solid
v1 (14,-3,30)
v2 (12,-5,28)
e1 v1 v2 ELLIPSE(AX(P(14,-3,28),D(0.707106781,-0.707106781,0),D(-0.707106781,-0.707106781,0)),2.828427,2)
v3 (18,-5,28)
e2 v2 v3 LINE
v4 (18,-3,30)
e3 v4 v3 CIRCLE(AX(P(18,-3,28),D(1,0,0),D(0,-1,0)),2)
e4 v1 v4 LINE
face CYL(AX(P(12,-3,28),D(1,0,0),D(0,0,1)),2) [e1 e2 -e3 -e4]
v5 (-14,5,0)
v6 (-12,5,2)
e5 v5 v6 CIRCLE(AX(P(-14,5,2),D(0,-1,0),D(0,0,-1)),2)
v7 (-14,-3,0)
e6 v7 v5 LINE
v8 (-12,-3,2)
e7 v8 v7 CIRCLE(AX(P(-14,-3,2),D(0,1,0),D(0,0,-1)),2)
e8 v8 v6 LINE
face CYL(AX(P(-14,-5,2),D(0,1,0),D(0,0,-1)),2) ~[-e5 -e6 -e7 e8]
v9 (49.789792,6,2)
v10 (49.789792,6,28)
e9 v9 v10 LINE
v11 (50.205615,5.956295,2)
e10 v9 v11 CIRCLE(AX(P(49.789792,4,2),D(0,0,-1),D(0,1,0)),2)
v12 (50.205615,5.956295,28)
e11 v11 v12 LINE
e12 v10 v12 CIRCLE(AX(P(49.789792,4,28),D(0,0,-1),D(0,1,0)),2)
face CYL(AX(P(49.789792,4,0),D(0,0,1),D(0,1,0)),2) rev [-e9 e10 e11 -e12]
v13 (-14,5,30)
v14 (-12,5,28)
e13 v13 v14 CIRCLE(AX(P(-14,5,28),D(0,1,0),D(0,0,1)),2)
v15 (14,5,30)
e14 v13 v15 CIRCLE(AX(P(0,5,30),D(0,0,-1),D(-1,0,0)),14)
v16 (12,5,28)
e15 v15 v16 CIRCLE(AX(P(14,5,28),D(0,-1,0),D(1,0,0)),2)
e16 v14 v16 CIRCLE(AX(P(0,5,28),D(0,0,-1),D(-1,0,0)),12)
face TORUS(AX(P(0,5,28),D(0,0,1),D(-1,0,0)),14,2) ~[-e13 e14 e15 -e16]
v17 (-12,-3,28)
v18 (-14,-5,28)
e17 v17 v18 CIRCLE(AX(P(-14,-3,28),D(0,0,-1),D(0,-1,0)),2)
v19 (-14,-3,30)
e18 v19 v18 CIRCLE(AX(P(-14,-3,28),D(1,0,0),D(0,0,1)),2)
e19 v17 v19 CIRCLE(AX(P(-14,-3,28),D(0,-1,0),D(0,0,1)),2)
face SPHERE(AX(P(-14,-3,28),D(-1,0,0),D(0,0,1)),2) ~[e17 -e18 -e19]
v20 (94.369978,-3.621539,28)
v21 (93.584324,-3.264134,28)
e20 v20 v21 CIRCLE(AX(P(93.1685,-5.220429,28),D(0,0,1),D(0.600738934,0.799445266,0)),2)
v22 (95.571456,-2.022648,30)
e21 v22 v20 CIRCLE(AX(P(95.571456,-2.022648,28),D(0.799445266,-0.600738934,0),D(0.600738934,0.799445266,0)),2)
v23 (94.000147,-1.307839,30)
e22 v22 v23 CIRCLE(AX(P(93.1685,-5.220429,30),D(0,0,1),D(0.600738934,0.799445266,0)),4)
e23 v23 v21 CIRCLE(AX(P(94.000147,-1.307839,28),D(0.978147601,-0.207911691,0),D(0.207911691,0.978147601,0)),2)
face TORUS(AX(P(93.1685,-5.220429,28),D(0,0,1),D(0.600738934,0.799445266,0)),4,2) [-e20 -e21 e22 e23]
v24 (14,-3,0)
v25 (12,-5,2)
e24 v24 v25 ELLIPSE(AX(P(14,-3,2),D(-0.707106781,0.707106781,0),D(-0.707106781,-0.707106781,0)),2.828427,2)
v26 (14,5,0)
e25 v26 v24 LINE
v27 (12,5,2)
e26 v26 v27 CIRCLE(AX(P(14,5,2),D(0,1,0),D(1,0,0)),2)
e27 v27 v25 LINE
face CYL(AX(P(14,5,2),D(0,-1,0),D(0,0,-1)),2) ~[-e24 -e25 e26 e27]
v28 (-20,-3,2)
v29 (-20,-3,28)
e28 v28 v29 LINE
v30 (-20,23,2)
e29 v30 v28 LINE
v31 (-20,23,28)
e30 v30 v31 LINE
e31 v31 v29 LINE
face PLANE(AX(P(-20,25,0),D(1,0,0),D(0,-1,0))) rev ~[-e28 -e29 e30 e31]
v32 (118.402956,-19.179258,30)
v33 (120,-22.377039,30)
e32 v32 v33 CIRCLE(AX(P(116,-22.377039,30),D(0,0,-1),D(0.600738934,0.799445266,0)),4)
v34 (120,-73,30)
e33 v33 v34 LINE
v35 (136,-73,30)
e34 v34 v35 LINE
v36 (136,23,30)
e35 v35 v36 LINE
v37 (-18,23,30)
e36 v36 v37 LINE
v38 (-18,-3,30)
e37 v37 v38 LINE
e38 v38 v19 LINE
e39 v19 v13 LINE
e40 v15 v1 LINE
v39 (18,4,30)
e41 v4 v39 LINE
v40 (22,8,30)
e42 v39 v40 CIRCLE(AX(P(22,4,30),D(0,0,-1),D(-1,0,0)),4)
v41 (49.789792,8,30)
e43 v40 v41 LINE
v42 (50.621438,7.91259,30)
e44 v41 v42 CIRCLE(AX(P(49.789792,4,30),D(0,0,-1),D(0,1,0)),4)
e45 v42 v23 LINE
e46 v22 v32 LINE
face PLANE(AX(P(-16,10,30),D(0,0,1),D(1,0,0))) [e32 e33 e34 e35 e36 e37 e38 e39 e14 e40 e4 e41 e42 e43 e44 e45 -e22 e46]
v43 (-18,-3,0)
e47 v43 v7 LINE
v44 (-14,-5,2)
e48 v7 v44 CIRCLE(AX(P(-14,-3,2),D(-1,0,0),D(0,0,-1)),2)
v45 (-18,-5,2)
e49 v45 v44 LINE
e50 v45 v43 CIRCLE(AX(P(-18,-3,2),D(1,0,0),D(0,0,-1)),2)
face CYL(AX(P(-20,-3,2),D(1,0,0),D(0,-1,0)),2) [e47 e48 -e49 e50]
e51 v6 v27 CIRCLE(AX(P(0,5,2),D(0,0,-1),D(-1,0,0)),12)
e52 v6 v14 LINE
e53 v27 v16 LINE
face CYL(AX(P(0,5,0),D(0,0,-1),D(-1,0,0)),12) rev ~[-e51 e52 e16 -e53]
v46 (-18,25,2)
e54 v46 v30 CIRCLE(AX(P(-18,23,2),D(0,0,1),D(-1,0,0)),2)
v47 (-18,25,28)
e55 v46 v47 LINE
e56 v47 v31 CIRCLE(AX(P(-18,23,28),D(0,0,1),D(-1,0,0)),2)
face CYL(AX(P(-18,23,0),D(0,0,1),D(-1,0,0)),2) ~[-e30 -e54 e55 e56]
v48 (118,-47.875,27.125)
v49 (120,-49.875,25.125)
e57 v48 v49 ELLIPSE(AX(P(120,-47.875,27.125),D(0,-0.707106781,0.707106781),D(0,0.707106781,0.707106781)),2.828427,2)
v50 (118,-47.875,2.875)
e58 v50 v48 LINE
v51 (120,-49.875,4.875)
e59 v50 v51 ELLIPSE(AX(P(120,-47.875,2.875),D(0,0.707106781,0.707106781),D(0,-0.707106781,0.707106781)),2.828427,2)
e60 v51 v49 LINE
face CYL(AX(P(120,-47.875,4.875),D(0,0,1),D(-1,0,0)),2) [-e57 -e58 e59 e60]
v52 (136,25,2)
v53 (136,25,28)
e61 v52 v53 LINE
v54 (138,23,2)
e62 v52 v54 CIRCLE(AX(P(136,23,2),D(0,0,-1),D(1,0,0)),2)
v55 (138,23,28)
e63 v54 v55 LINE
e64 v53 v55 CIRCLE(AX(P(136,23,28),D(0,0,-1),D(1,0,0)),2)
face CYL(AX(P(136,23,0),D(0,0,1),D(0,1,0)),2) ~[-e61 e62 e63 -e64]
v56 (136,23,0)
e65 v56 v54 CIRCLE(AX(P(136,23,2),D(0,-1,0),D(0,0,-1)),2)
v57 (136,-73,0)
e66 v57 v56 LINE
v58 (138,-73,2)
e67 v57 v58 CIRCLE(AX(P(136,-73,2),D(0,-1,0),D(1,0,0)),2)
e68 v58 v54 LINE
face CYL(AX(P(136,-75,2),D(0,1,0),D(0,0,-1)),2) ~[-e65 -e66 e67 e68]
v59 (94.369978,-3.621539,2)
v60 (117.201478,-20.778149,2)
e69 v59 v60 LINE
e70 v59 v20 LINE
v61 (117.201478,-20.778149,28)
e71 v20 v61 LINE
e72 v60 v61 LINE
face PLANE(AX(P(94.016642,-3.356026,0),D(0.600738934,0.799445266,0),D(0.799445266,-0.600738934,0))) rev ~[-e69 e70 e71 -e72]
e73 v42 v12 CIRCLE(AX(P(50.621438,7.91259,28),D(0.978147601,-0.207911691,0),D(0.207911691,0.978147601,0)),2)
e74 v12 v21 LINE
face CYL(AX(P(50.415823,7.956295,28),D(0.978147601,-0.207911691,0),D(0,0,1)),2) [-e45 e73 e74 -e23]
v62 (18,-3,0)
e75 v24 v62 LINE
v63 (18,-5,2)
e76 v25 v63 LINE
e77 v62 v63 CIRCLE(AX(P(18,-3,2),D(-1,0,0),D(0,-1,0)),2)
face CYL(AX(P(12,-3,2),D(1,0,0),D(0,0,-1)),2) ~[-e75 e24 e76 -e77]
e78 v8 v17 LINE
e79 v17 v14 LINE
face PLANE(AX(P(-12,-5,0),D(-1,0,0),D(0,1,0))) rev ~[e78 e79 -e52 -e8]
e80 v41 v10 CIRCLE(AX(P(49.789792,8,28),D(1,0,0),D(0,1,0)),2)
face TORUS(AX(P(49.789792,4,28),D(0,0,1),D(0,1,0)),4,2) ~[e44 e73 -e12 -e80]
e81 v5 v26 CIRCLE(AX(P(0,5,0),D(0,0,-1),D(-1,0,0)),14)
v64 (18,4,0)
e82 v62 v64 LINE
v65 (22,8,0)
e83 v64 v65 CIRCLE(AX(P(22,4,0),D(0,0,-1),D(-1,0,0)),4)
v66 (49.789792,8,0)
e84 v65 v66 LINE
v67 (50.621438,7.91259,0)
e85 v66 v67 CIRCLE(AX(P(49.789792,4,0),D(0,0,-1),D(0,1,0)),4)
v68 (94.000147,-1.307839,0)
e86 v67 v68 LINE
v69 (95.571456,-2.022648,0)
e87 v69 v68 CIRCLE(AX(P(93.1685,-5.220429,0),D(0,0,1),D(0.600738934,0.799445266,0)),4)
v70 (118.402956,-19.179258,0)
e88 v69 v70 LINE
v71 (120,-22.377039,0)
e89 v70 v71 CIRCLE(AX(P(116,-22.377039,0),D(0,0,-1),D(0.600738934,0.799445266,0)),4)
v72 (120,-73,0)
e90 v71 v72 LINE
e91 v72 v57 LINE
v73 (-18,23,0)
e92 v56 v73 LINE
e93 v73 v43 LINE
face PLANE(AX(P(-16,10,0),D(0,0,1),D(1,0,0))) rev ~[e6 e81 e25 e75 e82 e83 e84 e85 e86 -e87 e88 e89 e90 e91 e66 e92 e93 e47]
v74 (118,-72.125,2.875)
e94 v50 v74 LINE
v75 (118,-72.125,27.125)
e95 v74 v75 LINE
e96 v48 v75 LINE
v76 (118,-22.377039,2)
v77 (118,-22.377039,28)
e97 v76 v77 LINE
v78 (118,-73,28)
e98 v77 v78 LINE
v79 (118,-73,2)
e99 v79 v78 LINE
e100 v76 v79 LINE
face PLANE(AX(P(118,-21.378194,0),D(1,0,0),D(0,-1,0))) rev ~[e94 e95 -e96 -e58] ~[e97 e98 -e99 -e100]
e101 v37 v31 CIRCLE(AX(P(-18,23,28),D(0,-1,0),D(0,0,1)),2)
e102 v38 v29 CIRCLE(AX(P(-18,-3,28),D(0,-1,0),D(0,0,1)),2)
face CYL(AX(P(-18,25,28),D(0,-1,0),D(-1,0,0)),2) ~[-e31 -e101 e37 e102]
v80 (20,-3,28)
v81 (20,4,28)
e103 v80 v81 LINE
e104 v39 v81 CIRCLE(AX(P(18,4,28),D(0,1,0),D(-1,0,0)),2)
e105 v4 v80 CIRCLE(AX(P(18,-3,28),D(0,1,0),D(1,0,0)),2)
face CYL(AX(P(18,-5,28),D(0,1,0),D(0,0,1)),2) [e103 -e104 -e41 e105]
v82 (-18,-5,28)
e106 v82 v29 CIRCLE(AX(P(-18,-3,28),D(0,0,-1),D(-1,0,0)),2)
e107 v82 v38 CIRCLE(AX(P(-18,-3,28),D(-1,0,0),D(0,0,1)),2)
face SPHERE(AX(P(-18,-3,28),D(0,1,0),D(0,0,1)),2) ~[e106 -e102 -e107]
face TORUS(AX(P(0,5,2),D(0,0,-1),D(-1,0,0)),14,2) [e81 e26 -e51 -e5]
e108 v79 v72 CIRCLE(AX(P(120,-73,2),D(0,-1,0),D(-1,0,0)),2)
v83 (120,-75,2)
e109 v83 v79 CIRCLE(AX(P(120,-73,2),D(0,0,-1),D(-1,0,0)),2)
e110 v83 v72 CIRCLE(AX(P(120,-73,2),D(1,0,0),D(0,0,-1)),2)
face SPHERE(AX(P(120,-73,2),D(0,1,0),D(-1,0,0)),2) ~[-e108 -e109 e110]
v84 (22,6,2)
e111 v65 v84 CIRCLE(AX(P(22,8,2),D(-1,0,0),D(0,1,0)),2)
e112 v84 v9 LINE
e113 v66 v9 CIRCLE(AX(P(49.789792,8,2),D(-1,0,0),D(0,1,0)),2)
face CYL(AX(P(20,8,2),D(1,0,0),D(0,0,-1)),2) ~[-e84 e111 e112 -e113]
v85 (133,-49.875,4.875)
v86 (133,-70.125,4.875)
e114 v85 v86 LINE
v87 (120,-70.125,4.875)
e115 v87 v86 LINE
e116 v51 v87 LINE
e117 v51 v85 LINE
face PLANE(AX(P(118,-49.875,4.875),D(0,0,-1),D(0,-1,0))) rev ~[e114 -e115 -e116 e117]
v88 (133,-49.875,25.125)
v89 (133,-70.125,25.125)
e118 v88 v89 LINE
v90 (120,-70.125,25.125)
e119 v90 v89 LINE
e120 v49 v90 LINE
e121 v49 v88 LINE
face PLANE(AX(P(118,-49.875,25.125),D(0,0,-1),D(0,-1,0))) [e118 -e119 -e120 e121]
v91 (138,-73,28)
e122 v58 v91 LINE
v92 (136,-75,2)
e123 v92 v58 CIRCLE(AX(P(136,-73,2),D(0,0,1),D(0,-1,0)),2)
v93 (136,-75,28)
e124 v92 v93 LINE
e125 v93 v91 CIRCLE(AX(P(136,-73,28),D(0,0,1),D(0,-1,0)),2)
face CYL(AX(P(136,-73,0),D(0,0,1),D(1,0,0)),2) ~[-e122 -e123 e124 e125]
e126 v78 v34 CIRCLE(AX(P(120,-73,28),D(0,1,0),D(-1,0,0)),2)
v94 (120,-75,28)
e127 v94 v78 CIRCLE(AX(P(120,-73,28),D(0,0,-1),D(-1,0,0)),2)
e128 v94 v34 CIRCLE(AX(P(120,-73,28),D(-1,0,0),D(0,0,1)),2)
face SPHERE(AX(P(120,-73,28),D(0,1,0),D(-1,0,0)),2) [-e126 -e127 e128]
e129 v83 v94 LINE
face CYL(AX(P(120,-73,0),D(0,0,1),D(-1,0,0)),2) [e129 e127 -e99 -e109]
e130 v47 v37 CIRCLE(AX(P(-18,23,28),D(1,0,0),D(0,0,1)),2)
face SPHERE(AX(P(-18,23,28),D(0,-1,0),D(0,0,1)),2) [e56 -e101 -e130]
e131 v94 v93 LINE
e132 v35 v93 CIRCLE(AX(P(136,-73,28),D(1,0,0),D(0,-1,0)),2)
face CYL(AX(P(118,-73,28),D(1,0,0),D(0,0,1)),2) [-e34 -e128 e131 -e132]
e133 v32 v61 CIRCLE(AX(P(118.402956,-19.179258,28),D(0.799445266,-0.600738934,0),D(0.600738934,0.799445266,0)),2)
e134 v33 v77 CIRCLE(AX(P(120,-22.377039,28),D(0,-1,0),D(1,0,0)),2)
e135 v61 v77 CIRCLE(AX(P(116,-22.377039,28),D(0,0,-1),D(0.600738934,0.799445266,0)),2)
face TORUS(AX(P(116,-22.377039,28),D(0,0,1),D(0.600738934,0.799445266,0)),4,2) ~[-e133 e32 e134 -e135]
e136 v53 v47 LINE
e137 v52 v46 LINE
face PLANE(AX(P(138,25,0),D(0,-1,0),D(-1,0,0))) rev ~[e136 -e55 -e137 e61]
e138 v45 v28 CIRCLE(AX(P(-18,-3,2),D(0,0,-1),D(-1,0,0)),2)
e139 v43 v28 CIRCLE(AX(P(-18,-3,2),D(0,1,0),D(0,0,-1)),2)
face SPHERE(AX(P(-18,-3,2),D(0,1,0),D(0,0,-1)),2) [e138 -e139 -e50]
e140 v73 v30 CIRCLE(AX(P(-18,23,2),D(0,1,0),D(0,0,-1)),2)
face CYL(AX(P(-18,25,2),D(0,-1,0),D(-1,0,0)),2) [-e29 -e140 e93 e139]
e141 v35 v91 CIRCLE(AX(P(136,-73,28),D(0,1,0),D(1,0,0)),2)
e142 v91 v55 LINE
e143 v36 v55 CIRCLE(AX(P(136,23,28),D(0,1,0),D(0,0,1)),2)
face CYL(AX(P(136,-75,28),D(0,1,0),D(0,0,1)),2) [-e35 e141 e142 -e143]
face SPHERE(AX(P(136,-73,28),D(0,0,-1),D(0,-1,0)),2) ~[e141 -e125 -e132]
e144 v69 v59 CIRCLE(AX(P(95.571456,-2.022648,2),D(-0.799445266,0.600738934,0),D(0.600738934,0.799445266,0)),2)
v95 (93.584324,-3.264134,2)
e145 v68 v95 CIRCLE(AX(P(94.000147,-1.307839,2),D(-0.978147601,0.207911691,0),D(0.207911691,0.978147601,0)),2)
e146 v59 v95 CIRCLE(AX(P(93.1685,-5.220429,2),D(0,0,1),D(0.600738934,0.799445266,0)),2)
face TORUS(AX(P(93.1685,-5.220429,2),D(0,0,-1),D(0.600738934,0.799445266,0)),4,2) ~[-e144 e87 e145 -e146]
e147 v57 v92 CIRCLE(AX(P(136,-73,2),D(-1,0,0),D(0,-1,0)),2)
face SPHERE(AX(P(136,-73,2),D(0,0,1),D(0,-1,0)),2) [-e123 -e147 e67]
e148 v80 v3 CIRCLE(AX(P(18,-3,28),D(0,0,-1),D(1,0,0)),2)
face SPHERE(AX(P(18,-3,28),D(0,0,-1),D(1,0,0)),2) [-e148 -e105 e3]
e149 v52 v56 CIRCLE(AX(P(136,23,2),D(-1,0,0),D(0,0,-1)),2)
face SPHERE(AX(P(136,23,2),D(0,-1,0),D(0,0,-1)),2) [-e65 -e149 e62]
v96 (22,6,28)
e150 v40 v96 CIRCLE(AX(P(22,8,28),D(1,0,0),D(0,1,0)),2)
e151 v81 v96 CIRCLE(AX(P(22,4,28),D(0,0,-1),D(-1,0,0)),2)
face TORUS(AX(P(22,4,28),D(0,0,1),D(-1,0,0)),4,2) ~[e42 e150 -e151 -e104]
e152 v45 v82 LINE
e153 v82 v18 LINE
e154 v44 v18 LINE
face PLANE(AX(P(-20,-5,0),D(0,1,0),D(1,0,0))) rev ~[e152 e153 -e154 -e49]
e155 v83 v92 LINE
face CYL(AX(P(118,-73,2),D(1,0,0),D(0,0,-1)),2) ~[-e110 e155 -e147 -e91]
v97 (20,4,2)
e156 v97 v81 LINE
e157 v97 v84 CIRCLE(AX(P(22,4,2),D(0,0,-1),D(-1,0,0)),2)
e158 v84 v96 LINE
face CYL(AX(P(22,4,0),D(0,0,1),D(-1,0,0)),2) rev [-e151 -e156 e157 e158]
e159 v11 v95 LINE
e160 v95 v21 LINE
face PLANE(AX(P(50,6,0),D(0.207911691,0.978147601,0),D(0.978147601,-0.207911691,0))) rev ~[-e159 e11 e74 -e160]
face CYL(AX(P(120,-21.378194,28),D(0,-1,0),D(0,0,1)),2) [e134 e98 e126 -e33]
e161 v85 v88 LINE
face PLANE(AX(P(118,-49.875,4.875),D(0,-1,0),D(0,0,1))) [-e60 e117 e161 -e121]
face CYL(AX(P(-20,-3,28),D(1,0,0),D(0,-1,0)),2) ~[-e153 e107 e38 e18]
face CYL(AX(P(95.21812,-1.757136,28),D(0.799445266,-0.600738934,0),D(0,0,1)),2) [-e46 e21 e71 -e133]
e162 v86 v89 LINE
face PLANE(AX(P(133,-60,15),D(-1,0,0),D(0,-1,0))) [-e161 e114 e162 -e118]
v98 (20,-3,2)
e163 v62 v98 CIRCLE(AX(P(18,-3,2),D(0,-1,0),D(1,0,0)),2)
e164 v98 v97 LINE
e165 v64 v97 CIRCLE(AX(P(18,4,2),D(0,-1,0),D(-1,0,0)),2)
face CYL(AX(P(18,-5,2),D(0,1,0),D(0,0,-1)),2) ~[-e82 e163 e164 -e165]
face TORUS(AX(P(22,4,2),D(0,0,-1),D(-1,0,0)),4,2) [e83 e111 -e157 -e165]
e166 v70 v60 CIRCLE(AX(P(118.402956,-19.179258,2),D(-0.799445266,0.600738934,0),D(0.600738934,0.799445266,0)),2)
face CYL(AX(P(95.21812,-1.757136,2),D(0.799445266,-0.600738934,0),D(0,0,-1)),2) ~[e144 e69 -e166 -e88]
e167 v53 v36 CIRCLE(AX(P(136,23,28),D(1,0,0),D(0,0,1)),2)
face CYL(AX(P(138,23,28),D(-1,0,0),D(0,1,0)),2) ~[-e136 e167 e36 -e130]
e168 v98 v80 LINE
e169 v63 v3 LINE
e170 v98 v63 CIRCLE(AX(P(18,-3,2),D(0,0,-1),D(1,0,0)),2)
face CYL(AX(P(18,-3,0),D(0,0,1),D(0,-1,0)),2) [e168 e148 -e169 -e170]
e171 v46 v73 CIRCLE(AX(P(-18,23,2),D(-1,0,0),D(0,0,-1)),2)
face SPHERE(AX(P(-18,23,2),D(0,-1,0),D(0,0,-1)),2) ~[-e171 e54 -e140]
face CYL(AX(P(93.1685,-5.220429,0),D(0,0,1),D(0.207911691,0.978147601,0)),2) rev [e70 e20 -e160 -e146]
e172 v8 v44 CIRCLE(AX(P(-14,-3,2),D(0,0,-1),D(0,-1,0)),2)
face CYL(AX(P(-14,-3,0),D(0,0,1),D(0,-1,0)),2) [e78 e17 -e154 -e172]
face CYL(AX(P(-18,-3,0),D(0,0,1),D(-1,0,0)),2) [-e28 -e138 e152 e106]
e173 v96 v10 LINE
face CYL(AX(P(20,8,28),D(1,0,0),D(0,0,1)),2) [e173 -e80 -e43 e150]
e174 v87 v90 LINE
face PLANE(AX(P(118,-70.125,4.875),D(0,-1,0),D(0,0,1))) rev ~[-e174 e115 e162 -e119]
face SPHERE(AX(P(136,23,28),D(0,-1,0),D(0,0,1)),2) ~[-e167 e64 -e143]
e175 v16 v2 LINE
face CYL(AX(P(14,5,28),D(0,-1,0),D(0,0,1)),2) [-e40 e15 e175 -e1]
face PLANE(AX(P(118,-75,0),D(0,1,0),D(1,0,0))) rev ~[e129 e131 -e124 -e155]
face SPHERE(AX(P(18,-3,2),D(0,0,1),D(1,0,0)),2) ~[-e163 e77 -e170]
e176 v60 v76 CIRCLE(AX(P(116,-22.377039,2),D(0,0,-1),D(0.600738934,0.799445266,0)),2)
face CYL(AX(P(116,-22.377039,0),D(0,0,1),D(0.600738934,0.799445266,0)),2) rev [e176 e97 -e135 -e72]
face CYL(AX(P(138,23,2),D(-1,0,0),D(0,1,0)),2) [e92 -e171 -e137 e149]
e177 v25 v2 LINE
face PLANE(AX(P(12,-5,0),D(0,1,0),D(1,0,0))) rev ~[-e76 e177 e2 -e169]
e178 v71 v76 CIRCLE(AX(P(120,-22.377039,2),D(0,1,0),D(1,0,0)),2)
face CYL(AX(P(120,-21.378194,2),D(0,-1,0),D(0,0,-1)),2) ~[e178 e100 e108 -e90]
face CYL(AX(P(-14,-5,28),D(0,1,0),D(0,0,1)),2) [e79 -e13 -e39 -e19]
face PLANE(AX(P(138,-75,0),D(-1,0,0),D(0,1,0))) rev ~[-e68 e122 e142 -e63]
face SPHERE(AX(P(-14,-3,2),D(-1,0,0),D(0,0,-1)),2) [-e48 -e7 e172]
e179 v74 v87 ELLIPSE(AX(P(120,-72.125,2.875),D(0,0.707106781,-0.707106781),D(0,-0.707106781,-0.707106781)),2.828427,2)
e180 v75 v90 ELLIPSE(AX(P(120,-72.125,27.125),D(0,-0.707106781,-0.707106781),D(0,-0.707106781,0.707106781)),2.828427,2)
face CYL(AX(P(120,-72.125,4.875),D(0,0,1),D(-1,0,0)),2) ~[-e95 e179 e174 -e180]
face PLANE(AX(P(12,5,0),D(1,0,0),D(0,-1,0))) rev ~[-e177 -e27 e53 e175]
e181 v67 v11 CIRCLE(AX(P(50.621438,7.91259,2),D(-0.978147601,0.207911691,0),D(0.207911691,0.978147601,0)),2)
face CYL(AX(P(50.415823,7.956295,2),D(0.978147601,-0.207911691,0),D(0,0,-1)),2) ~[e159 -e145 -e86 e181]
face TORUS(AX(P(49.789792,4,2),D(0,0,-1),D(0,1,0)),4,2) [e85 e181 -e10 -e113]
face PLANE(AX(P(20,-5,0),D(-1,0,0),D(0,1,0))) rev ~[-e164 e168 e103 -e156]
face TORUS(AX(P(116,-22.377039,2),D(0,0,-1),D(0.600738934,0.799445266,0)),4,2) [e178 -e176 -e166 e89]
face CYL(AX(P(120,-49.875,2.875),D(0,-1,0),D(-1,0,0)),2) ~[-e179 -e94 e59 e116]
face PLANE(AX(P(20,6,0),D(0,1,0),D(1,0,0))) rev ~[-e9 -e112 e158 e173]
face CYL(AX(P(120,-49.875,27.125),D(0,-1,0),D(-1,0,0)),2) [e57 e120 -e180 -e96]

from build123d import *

# Parameters (mm, degrees)
F1_DEPTH = 30
F2_W     = 20.25
F2_H     = 20.25
F3_DEPTH = 15
F4_R     = 2


# Not quite as in the source:
# - a feature names something its author has since deleted; it is built from what else it names


with BuildPart() as f1:
    # F0 (on Top) → F1 (new body)
    with BuildSketch(Plane.XY):
        Polygon((-12, -5), (-12, 5), (-12, 25), (-20, 25), (-20, -5), align=None)
        with BuildLine():
            ThreePointArc((-12, 5), (0, 17), (12, 5))
            Line((12, 5), (12, 25))
            Line((12, 25), (-12, 25))
            Line((-12, 25), (-12, 5))
        make_face()
        Polygon((12, 25), (12, 5), (12, -5), (20, -5), (20, 6), (50, 6), (94.016642033, -3.3560260868), (118, -21.3781941203), (118, -75), (138, -75), (138, -15), (138, 25), align=None)
    extrude(amount=F1_DEPTH)

    # F2 (on face) → F3 (cut)
    with BuildSketch(Plane(origin=(118, 0, 0), x_dir=(0, -1, 0), z_dir=(-1, 0, 0))):
        with Locations((60, 15)):
            Rectangle(F2_W, F2_H)
    extrude(amount=-F3_DEPTH, mode=Mode.SUBTRACT)

    # F4
    f4_edges = [f1.edges().sort_by_distance(p)[0] for p in [
        (20, -5, 15),
        (20, 6, 15),
        (20, 0.5, 0),
        (20, 0.5, 30),
        (50, 6, 15),
        (35, 6, 0),
        (35, 6, 30),
        (94.016642, -3.356026, 15),
        (118, -21.378194, 15),
        (106.008321, -12.36711, 0),
        (106.008321, -12.36711, 30),
        (118, -48.189097, 0),
        (118, -48.189097, 30),
        (118, -75, 15),
        (118, -60, 4.875),
        (118, -49.875, 15),
        (118, -60, 25.125),
        (118, -70.125, 15),
        (138, -75, 15),
        (128, -75, 0),
        (128, -75, 30),
        (-20, 10, 30),
        (-16, -5, 30),
        (-12, 0, 30),
        (0, 17, 30),
        (12, 0, 30),
        (16, -5, 30),
        (72.008321, 1.321987, 30),
        (138, -25, 30),
        (59, 25, 30),
        (-20, 10, 0),
        (-16, -5, 0),
        (-12, 0, 0),
        (0, 17, 0),
        (12, 0, 0),
        (16, -5, 0),
        (72.008321, 1.321987, 0),
        (138, -25, 0),
        (59, 25, 0),
        (-20, -5, 15),
        (-12, -5, 15),
        (138, 25, 15),
        (-20, 25, 15),
    ]]
    fillet(f4_edges, radius=F4_R)


solid = f1.part
